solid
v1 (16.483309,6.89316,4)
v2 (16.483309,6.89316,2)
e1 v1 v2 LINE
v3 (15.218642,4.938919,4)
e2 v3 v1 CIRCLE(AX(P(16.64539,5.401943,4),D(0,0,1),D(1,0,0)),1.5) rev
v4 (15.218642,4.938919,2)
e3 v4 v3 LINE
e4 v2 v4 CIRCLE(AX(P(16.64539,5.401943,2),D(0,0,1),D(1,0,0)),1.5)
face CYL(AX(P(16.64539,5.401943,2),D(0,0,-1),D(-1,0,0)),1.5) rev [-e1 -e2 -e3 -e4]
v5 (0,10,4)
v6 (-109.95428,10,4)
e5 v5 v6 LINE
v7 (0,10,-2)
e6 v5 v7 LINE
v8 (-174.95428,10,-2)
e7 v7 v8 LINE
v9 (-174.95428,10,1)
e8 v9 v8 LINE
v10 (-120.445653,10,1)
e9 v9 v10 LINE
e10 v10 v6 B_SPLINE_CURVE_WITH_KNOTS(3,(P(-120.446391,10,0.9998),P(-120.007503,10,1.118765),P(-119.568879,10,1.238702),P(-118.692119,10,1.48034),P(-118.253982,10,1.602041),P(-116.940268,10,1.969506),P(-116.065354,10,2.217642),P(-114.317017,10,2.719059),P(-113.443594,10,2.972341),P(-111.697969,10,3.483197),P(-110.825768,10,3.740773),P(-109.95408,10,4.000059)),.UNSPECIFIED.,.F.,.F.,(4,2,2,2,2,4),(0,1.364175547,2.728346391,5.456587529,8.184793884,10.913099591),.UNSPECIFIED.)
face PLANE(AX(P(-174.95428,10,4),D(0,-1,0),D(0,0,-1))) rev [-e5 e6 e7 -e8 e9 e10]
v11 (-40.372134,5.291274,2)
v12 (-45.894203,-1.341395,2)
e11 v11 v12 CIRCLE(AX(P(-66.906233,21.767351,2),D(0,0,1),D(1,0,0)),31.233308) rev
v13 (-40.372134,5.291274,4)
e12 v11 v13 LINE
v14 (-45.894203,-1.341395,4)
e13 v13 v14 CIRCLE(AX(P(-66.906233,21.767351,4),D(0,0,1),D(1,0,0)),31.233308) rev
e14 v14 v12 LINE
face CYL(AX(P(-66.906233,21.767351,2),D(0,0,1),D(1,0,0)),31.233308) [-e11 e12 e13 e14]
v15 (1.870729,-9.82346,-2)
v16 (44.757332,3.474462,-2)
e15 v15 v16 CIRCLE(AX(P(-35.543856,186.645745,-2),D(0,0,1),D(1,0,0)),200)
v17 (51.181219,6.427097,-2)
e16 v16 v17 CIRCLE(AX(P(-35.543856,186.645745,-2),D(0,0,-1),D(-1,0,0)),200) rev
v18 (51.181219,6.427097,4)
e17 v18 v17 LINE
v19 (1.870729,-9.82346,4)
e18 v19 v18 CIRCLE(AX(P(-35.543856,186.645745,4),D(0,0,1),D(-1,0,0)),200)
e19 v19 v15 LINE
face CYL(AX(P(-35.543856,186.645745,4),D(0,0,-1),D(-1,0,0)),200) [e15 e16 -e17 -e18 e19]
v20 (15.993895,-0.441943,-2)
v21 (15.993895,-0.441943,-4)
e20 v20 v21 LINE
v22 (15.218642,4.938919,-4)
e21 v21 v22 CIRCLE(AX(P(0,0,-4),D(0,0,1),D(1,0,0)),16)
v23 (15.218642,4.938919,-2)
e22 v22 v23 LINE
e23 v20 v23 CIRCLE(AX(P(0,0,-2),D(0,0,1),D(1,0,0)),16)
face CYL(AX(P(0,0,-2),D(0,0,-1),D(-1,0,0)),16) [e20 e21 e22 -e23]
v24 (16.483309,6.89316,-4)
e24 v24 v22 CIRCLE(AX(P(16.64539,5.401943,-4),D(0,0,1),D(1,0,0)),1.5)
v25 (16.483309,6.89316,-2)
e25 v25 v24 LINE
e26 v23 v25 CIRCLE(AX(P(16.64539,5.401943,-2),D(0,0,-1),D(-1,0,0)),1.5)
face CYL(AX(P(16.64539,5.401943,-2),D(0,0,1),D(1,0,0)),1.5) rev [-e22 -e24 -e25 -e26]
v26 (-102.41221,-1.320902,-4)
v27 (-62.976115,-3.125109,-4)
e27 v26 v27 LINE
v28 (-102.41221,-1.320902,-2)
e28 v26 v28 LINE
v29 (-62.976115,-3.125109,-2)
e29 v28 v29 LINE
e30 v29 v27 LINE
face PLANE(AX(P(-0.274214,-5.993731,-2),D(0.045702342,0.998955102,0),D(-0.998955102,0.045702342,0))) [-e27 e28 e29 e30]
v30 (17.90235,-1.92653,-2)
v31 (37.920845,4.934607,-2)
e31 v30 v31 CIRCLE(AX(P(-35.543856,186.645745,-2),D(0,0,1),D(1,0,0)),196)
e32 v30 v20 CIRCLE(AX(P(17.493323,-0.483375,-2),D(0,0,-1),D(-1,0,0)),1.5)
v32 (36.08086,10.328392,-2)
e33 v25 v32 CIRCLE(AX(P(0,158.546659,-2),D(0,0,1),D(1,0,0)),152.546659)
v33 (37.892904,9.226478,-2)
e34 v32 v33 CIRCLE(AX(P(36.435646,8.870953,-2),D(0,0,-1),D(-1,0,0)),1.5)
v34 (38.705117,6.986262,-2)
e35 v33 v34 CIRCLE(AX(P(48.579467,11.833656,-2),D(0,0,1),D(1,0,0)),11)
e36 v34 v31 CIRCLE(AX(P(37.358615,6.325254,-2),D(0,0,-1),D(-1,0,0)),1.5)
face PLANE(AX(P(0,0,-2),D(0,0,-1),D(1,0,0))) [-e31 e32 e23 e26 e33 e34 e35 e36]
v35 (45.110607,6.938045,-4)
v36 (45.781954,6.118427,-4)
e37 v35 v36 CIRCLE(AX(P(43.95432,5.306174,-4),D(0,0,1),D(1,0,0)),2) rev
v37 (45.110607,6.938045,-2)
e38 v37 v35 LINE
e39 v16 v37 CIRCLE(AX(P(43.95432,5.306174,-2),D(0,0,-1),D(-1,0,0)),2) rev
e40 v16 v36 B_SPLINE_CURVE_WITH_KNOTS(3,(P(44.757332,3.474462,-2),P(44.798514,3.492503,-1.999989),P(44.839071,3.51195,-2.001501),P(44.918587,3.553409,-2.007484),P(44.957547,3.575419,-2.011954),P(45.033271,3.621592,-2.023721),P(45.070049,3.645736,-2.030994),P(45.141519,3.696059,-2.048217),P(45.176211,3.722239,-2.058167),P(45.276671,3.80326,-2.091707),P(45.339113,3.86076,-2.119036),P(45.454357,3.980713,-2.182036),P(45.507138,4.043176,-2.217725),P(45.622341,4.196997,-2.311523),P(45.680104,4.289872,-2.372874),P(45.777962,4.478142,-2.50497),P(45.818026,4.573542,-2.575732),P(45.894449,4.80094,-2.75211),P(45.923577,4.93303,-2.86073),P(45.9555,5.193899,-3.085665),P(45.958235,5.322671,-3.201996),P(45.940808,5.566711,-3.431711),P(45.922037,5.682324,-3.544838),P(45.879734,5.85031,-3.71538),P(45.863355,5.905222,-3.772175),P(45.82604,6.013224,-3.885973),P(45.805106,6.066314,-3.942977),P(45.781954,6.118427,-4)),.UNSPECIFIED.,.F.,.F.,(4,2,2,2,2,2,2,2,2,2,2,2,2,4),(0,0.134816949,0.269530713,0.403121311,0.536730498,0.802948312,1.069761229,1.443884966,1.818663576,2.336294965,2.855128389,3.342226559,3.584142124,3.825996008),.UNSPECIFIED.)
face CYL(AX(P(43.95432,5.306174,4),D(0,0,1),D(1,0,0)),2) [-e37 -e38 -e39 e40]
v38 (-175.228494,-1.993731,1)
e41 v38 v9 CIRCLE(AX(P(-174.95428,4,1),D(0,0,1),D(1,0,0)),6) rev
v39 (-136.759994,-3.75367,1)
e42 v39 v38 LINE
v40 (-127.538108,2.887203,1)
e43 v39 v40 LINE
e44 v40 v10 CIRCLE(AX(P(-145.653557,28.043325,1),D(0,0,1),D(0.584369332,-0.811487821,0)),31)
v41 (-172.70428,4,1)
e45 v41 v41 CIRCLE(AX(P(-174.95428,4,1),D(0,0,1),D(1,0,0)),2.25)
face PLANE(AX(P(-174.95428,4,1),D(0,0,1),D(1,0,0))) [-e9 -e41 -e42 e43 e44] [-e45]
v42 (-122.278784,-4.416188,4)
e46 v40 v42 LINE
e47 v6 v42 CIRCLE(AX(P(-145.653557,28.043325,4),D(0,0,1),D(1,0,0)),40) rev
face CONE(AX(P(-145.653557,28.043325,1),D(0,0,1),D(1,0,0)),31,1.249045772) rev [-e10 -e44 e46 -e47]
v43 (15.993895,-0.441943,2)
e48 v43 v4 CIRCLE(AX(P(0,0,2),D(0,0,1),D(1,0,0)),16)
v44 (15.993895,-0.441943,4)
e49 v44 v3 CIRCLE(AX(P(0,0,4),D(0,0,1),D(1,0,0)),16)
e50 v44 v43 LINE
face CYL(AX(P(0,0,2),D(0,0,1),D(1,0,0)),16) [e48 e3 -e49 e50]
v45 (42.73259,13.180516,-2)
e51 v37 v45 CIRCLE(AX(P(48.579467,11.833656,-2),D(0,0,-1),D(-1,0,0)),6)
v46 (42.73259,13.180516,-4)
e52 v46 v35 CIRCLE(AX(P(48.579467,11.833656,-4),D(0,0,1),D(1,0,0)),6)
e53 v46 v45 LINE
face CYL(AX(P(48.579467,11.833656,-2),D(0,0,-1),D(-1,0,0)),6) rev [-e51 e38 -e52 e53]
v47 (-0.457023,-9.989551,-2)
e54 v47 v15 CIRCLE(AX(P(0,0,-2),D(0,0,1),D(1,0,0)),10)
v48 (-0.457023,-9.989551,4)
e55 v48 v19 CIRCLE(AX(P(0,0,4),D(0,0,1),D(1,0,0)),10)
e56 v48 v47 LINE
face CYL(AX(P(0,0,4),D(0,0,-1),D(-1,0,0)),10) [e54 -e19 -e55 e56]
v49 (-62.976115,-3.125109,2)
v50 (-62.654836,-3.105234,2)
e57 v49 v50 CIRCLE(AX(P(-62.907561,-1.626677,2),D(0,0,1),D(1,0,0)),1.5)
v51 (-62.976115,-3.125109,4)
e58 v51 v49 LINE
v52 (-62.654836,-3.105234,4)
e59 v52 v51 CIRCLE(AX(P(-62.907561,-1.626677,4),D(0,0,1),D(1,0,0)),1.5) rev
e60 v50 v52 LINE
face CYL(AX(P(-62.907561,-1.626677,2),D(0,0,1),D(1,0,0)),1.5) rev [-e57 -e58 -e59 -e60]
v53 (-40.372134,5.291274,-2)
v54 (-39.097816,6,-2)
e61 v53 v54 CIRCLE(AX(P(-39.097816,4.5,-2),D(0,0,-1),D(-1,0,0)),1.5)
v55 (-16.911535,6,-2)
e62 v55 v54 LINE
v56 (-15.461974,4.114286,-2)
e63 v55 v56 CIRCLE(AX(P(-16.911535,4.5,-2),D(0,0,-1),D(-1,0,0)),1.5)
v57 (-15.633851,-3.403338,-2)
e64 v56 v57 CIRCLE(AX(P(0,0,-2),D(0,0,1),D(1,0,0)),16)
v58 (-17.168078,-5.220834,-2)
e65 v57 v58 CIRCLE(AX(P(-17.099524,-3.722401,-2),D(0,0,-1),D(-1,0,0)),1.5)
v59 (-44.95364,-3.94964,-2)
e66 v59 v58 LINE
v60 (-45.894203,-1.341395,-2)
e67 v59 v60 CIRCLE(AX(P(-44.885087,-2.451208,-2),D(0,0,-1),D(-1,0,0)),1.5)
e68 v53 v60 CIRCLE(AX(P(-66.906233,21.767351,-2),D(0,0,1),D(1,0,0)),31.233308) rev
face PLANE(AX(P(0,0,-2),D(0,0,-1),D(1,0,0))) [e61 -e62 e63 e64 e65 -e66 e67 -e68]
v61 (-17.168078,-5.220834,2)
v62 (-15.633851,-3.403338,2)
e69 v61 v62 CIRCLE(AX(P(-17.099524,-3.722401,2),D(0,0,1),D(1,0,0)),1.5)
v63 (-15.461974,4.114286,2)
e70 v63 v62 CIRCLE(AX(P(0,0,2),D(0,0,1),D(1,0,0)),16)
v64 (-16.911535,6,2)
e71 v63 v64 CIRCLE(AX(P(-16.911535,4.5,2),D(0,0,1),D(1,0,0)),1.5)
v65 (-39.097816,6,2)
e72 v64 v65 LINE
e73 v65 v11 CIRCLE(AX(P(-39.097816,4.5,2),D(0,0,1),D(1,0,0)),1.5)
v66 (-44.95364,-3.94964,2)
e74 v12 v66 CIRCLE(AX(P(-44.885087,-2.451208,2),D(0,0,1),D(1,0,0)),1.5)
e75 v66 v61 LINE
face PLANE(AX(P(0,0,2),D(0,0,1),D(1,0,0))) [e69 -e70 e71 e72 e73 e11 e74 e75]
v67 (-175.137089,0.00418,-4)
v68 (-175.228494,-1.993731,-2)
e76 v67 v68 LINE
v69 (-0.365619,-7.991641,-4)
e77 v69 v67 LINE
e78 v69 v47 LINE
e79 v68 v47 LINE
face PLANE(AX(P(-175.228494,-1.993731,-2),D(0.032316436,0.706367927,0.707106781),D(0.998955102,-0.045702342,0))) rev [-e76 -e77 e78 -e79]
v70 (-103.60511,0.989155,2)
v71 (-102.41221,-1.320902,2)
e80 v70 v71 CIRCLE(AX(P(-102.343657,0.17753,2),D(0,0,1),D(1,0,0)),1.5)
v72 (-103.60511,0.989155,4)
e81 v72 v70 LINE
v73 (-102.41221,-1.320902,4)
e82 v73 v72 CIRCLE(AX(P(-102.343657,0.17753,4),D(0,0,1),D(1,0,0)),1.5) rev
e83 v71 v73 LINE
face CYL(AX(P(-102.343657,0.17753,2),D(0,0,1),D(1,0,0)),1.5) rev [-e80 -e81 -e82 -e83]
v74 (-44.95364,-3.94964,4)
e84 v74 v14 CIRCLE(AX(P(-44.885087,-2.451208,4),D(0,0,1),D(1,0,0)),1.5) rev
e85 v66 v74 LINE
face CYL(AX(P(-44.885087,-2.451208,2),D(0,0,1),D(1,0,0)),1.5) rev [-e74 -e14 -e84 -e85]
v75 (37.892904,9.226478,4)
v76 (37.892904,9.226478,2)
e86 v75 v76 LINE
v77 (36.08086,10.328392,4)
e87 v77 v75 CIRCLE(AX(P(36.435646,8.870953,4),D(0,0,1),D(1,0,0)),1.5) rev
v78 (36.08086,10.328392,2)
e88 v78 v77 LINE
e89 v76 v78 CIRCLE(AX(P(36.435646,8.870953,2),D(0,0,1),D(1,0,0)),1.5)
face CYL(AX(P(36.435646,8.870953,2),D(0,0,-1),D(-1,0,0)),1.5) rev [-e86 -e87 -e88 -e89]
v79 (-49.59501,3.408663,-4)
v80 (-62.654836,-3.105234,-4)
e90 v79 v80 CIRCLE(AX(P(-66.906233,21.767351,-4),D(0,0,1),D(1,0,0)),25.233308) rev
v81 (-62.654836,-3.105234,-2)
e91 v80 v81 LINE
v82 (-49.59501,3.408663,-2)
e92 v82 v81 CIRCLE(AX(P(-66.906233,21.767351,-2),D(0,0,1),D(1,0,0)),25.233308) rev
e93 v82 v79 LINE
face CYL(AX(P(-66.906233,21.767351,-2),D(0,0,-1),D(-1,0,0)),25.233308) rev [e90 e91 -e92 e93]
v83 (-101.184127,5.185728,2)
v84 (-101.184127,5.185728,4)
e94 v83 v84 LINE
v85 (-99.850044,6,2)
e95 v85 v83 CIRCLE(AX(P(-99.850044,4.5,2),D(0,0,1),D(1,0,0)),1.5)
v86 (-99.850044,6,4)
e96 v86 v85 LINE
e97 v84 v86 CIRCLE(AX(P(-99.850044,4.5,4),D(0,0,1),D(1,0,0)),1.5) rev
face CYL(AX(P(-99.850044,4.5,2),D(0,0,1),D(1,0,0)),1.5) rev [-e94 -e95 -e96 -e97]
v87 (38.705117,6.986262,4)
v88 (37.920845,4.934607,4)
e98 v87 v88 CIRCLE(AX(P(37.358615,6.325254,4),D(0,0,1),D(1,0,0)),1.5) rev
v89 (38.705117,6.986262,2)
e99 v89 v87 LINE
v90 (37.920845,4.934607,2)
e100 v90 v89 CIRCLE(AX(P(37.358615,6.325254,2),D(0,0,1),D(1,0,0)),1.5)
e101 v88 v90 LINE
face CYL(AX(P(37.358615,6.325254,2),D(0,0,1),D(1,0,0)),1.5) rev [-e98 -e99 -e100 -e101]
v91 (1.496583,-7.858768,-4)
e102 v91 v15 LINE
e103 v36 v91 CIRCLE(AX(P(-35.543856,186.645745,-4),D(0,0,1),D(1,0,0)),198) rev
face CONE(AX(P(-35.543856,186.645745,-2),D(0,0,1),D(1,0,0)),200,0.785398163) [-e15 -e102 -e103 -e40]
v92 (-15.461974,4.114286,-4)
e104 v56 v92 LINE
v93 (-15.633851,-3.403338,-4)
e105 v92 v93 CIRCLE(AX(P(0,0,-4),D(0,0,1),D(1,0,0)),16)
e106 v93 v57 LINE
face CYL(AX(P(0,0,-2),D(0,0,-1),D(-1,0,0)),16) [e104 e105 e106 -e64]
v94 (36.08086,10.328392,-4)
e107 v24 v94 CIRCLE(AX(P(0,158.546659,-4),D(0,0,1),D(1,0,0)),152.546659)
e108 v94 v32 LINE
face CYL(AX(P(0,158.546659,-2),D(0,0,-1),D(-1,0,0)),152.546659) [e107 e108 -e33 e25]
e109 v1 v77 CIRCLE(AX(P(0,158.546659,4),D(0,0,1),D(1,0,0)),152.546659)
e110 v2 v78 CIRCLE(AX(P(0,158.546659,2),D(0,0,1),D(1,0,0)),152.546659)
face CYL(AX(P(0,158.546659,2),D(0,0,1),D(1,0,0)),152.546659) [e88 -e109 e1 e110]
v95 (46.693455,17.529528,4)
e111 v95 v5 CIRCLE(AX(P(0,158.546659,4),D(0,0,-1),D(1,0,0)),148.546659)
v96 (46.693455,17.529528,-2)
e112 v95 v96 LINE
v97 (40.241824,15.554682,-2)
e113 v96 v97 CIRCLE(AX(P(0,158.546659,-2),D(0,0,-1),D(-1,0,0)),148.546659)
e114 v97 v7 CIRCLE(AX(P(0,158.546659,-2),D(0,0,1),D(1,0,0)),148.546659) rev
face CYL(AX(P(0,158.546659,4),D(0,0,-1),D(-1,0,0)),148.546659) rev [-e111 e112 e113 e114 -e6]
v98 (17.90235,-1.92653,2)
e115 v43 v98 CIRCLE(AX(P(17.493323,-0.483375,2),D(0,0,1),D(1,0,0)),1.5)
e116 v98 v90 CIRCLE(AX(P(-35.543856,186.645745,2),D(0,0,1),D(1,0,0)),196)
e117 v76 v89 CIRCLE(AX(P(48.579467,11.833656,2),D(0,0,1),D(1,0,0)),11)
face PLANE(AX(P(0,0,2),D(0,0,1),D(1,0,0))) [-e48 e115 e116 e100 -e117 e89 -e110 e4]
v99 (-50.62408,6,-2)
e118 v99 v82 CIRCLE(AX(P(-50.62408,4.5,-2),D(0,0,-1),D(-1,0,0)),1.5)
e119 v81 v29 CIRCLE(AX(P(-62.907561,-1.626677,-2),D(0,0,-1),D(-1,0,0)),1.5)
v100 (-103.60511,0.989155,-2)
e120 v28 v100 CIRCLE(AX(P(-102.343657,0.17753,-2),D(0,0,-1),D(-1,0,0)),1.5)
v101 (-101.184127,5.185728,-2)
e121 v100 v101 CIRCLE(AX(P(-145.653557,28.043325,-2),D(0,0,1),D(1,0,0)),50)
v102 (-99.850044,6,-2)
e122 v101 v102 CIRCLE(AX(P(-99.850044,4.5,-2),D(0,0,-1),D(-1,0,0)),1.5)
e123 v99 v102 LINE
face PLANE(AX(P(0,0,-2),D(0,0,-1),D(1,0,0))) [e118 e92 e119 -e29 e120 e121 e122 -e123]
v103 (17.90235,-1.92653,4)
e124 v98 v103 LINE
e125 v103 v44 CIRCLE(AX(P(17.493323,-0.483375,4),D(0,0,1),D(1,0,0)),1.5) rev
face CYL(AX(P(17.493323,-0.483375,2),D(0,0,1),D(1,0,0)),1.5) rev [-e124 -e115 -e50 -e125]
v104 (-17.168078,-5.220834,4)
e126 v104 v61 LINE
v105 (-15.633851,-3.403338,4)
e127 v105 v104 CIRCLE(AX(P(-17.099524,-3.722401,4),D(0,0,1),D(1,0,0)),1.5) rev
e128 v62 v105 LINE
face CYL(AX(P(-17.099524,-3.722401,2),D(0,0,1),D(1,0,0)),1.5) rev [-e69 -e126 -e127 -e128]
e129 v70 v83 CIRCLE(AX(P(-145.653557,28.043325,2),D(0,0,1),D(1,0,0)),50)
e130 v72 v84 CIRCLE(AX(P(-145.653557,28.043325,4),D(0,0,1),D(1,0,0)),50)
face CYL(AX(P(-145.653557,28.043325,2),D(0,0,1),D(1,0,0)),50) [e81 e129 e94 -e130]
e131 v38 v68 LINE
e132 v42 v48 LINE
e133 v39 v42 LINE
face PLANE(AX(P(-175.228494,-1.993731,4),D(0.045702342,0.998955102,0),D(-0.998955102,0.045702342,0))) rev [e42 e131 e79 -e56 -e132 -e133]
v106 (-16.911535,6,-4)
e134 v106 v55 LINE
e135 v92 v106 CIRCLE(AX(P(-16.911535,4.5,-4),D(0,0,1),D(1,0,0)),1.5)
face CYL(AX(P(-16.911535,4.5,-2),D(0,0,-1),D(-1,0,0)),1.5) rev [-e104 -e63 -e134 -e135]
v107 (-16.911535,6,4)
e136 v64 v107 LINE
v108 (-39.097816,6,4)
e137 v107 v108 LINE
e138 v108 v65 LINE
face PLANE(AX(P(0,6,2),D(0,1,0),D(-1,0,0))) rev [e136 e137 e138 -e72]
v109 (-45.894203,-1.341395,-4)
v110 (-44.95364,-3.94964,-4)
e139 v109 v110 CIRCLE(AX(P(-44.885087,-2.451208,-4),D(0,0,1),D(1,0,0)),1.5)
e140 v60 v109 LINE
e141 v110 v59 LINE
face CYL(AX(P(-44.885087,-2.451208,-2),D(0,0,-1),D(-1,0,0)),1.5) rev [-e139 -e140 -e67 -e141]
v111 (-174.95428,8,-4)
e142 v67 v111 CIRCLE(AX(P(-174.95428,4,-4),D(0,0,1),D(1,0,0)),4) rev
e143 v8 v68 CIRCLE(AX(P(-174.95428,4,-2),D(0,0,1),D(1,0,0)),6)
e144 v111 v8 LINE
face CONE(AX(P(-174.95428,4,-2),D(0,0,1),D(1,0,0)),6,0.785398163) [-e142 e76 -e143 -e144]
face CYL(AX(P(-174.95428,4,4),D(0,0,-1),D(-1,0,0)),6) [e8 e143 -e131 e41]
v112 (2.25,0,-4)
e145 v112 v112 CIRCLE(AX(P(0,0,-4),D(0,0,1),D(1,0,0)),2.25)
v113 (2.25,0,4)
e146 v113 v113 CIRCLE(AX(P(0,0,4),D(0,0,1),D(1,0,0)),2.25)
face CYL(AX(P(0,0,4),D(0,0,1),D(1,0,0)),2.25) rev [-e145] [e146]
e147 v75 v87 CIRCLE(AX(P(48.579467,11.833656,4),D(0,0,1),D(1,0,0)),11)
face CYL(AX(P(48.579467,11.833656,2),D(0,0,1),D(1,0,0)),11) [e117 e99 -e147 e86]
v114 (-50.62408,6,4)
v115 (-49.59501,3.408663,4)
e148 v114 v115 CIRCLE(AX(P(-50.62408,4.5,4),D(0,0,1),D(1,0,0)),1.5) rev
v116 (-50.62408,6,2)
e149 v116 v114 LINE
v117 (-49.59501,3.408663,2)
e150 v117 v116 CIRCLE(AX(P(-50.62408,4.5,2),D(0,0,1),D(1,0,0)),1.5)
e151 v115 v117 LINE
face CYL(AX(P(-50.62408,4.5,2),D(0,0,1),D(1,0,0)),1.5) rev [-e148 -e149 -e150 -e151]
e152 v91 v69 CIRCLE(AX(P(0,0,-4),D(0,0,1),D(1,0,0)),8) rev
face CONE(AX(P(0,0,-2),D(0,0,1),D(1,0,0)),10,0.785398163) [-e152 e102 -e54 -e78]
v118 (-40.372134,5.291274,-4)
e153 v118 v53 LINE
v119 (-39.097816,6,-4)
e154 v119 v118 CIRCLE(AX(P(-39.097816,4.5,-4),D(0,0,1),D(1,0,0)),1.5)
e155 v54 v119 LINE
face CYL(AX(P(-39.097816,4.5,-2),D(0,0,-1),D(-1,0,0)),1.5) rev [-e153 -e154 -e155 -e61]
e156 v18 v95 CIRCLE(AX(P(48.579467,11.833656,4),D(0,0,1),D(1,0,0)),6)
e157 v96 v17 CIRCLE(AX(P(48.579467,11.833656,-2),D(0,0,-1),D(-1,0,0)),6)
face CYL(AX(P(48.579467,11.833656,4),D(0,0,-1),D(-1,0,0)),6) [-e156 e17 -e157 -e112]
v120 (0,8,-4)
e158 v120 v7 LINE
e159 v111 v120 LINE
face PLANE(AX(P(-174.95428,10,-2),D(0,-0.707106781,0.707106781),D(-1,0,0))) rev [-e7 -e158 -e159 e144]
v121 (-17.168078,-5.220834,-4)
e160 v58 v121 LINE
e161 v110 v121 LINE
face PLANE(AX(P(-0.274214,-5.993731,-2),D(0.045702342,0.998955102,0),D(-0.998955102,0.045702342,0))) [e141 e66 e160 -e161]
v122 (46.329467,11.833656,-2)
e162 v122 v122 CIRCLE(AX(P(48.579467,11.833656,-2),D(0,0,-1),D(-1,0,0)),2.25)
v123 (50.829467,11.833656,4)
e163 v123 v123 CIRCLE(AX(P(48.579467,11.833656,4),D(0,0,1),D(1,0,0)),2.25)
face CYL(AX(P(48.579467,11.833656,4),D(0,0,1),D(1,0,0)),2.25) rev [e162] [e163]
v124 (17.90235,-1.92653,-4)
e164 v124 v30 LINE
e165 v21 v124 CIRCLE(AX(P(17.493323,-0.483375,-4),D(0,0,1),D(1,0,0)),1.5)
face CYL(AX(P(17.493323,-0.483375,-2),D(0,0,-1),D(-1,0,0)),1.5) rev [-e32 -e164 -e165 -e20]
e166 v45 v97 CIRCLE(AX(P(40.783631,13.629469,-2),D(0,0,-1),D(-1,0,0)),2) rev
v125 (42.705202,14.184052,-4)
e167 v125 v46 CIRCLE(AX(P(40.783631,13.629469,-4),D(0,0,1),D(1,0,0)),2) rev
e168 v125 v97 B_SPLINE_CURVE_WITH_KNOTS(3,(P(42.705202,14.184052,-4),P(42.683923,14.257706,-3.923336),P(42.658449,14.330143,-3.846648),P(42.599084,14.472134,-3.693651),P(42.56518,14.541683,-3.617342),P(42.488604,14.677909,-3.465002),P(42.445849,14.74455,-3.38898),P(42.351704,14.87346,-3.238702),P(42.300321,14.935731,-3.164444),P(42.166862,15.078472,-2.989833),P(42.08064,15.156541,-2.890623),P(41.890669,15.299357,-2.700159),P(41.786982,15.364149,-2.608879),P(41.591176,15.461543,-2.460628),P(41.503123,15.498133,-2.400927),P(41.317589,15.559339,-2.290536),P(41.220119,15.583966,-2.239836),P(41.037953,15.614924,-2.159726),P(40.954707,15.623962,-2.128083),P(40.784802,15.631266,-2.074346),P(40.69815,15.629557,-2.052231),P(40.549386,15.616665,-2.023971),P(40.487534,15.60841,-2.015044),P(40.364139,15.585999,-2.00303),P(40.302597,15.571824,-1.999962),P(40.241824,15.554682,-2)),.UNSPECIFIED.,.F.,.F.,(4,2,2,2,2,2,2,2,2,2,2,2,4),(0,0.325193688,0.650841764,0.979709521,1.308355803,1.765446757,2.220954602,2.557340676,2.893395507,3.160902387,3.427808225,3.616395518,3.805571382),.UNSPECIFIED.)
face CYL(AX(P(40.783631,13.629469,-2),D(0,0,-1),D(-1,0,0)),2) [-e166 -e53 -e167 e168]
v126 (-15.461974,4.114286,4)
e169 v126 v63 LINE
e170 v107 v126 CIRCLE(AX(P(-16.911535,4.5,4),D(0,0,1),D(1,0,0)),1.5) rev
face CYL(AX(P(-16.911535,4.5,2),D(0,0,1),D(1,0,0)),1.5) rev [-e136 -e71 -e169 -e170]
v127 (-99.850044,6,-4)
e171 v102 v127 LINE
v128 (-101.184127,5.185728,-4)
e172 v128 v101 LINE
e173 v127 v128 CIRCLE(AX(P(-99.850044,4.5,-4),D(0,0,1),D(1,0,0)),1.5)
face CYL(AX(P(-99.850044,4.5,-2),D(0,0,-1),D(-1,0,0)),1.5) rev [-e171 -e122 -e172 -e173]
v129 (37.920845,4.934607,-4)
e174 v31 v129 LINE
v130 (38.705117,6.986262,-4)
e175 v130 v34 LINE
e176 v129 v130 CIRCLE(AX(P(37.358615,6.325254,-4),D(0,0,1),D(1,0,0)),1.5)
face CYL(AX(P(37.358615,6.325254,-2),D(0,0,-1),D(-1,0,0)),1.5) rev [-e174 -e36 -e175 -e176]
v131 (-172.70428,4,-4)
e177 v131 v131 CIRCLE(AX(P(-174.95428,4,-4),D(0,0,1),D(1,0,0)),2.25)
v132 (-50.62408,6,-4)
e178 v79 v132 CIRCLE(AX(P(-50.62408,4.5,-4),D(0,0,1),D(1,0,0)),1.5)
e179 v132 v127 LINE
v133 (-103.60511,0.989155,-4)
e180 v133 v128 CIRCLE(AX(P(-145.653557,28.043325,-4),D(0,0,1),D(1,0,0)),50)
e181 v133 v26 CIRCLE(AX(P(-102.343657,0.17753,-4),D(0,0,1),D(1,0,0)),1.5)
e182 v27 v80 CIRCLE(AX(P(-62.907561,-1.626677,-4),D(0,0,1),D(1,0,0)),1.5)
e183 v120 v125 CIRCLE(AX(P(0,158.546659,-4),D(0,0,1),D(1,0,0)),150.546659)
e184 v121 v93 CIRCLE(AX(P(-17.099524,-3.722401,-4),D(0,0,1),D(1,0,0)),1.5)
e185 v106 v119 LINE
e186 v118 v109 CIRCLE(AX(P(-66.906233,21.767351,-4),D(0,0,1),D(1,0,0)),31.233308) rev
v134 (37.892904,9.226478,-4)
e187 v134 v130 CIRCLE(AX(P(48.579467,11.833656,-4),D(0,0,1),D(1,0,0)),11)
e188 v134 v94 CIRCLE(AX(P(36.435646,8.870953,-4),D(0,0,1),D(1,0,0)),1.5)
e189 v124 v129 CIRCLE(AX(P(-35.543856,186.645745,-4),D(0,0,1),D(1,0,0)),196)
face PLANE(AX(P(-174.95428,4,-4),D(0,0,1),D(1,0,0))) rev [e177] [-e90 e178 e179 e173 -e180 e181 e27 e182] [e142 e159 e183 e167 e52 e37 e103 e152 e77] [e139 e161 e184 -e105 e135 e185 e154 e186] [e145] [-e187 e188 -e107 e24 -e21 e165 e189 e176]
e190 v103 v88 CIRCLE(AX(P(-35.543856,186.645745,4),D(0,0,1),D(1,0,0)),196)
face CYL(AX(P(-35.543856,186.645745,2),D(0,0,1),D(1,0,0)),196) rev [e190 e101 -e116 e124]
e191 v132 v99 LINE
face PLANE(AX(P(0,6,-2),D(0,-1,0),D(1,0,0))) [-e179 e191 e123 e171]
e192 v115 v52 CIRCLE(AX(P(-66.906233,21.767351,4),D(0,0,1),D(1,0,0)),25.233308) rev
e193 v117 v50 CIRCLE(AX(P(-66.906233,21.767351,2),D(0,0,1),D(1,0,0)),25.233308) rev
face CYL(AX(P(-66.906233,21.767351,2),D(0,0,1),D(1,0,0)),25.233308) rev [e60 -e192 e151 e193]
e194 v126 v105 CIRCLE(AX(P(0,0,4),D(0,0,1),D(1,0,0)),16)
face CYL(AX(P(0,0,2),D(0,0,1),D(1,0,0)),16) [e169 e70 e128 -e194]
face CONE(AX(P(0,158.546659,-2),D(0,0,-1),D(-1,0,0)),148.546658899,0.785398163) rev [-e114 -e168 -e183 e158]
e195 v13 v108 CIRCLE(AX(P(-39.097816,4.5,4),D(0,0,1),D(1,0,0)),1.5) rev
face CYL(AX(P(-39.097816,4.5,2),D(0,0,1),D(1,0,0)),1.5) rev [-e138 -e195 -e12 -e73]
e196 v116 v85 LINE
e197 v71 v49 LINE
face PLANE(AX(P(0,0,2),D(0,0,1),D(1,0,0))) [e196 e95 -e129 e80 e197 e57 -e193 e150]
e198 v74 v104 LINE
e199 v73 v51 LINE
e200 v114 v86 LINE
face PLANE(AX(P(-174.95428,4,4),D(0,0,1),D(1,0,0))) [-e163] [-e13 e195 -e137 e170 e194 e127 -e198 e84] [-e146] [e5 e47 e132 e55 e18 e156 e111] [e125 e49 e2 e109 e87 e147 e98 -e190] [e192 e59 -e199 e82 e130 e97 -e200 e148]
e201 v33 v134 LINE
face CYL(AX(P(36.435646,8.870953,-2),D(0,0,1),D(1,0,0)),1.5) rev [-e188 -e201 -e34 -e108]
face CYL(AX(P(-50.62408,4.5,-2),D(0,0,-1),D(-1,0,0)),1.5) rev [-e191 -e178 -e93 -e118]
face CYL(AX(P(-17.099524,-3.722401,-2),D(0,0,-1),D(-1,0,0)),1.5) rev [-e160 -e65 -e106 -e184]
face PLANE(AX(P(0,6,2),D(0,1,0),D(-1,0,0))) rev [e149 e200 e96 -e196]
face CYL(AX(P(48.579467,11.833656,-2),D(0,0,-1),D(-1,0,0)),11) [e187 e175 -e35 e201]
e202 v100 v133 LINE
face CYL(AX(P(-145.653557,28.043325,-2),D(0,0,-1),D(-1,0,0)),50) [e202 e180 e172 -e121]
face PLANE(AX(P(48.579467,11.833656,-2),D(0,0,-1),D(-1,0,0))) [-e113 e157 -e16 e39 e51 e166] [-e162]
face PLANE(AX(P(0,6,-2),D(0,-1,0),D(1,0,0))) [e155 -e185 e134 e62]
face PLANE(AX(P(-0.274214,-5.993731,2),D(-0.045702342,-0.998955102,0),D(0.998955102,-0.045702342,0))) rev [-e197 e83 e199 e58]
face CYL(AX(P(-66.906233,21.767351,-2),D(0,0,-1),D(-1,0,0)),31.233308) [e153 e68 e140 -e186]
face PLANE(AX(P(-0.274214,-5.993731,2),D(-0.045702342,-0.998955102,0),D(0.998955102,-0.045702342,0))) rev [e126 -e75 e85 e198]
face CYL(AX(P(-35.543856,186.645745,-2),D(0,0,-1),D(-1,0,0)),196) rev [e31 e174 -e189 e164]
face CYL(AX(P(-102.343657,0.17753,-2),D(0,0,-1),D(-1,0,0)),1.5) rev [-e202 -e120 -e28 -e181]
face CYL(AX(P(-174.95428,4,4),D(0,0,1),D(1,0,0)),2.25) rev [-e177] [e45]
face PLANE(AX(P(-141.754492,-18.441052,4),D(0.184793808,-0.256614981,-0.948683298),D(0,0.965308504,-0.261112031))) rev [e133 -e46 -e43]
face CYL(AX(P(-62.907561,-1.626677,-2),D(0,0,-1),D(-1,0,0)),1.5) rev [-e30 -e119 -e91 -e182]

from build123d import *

# Parameters (mm, degrees)
BOSS_EXTRUDE2_DEPTH     = 4
CUT_EXTRUDE1_DEPTH      = 3
BOSS_EXTRUDE4_DEPTH     = 24
CUT_EXTRUDE3_DEPTH      = 25
CUT_EXTRUDE3_DEPTH_BACK = 183.067360447
SKETCH8_OUTSIDE_W       = 285.221
SKETCH8_OUTSIDE_H       = 85.963
CUT_EXTRUDE5_START      = -2
SKETCH15_R              = 6
CUT_EXTRUDE5_DEPTH      = 2
FILLET2_START           = -5
FILLET2_DEPTH           = 3
CUT_EXTRUDE4_DEPTH      = 2
FILLET1_R               = 1.5
FILLET1_OF_MIRROR2_R    = 1.5
CHAMFER2_SIZE           = 2
M4_CLEARANCE_HOLE1_D    = 4.5


with BuildPart() as part:
    # Sketch1 → Boss-Extrude2 (new, symmetric)
    with BuildSketch(Plane.XY):
        with BuildLine():
            Line((-174.954279742, 10), (0, 10))
            ThreePointArc((0, 10), (23.648322027, 11.894462409), (46.69345503, 17.529528282))
            ThreePointArc((46.69345503, 17.529528282), (54.142205969, 14.082195987), (51.181218931, 6.427096624))
            ThreePointArc((51.181218931, 6.427096624), (27.055536633, -3.305079876), (1.870729257, -9.823460289))
            ThreePointArc((1.870729257, -9.823460289), (0.711714534, -9.974640967), (-0.457023425, -9.98955102))
            Line((-0.457023425, -9.98955102), (-175.228493797, -1.993730612))
            ThreePointArc((-175.228493797, -1.993730612), (-180.95271219, 4.137142857), (-174.954279742, 10))
        make_face()
    extrude(amount=BOSS_EXTRUDE2_DEPTH, both=True)

    # Sketch4 → Cut-Extrude1 (cut)
    with BuildSketch(Plane.XY.offset(4)):
        with BuildLine():
            ThreePointArc((-174.954279742, 10), (-180.95271219, 4.137142857), (-175.228493797, -1.993730612))
            Line((-175.228493797, -1.993730612), (-122.27878396, -4.416187605))
            ThreePointArc((-122.27878396, -4.416187605), (-115.249733713, 2.05087413), (-109.954279742, 10))
            Line((-109.954279742, 10), (-174.954279742, 10))
        make_face()
    extrude(amount=-CUT_EXTRUDE1_DEPTH, mode=Mode.SUBTRACT)

    # Sweep2: sweep along a curve in space
    with BuildLine() as sweep2_path:
        ThreePointArc((-122.27878396, -4.416187605, 1), (-115.249733713, 2.05087413, 1), (-109.954279742, 10, 1))
    # Sketch9 → Sweep2 (sweep)
    with BuildSketch(Plane(origin=(-18.347220561, -36.300543819, 0), x_dir=(0.8924819376724606, -0.45108313083999296, 0), z_dir=(0.4510831308399929, 0.8924819376724605, 0))):
        Polygon((-102.643039948, -1), (-102.643039948, -4), (-111.643039948, -1), align=None)
    sweep(path=sweep2_path.line)

    # Sketch10 → Boss-Extrude4 (add)
    with BuildSketch(Plane(origin=(-82.616299838, -59.493723404, 0), x_dir=(0, 0, 1), z_dir=(-0.8114878209620178, -0.584369332212357, 0))):
        Polygon((1, 67.87228887), (4, 67.87228887), (1, 76.87228887), align=None)
    extrude(amount=BOSS_EXTRUDE4_DEPTH)

    # Sketch8 outside → Cut-Extrude3 (cut, two sides: drawn at the far end of the back side and taken through both)
    with BuildSketch(Plane.XY.offset(-4).offset(-CUT_EXTRUDE3_DEPTH_BACK)):
        with Locations((-63.1875, -0.3035)):
            Rectangle(SKETCH8_OUTSIDE_W, SKETCH8_OUTSIDE_H)
        with BuildLine():
            Line((0, 10), (-174.954279742, 10))
            ThreePointArc((-174.954279742, 10), (-180.95271219, 4.137142857), (-175.228493797, -1.993730612))
            Line((-175.228493797, -1.993730612), (-0.457023425, -9.98955102))
            ThreePointArc((-0.457023425, -9.98955102), (0.711714534, -9.974640967), (1.870729257, -9.823460289))
            ThreePointArc((1.870729257, -9.823460289), (27.055536633, -3.305079876), (51.181218931, 6.427096624))
            ThreePointArc((51.181218931, 6.427096624), (54.142205969, 14.082195987), (46.69345503, 17.529528282))
            ThreePointArc((46.69345503, 17.529528282), (23.648322027, 11.894462409), (0, 10))
        make_face(mode=Mode.SUBTRACT)
    extrude(amount=CUT_EXTRUDE3_DEPTH + CUT_EXTRUDE3_DEPTH_BACK, mode=Mode.SUBTRACT)

    # Sketch15 → Cut-Extrude5 (cut)
    with BuildSketch(Plane(origin=(0, 0, -4), x_dir=(-1, 0, 0), z_dir=(0, 0, -1)).offset(CUT_EXTRUDE5_START)):
        with Locations((-48.579466687, 11.83365609)):
            Circle(SKETCH15_R)
    extrude(amount=CUT_EXTRUDE5_DEPTH, mode=Mode.SUBTRACT)

    # Fillet2: read off the stored shape, not the designer's step
    # Fillet2 outline → Fillet2 (cut)
    with BuildSketch(Plane.XY.offset(FILLET2_START)):
        with BuildLine():
            ThreePointArc((40.241823664, 15.554681857), (42.163553049, 15.077161786), (42.732589809, 13.180515689))
            ThreePointArc((42.732589809, 13.180515689), (44.143492284, 15.873721819), (46.69345503, 17.529528282))
            ThreePointArc((46.69345503, 17.529528282), (43.478853193, 16.505470524), (40.241823664, 15.554681857))
        make_face()
        with BuildLine():
            ThreePointArc((45.110606605, 6.938044817), (45.943997016, 5.103233461), (44.757331788, 3.474461553))
            ThreePointArc((44.757331788, 3.474461553), (47.982323267, 4.922391468), (51.181218931, 6.427096624))
            ThreePointArc((51.181218931, 6.427096624), (48.076241077, 5.854796334), (45.110606605, 6.938044817))
        make_face()
    extrude(amount=FILLET2_DEPTH, mode=Mode.SUBTRACT)

    # Sketch14 → Cut-Extrude4 (cut)
    with BuildSketch(Plane.XY.offset(4)):
        with BuildLine():
            Line((-14.832396974, 6), (-39.944961285, 6))
            ThreePointArc((-39.944961285, 6), (-43.908510482, 0.633863605), (-48.921261535, -3.768121054))
            Line((-48.921261535, -3.768121054), (-15.091112688, -5.315855326))
            ThreePointArc((-15.091112688, -5.315855326), (-15.995819862, 0.365714286), (-14.832396974, 6))
        make_face()
        with BuildLine():
            ThreePointArc((-62.816908131, -3.132393183), (-54.164987884, -0.012926968), (-47.205713301, 6))
            Line((-47.205713301, 6), (-100.774922993, 6))
            ThreePointArc((-100.774922993, 6), (-102.783982304, 2.310087116), (-105.095731275, -1.198130822))
            Line((-105.095731275, -1.198130822), (-62.816908131, -3.132393183))
        make_face()
        with BuildLine():
            ThreePointArc((37.636421144, 10.71573201), (26.161853464, 8.260130678), (14.532481339, 6.693802069))
            ThreePointArc((14.532481339, 6.693802069), (15.849901808, 2.186461221), (15.802019276, -2.509220357))
            ThreePointArc((15.802019276, -2.509220357), (27.792022964, 1.161065661), (39.522801968, 5.590513918))
            ThreePointArc((39.522801968, 5.590513918), (38.25647934, 8.034191359), (37.636421144, 10.71573201))
        make_face()
    cut_extrude4 = extrude(amount=-CUT_EXTRUDE4_DEPTH, mode=Mode.SUBTRACT)

    # Fillet1
    fillet1_edges = [part.edges().sort_by_distance(p)[0] for p in [
        (14.532481339, 6.693802069, 3),
        (37.636421144, 10.71573201, 3),
        (39.522801968, 5.590513918, 3),
        (15.802019276, -2.509220357, 3),
        (-39.944961285, 6, 3),
        (-14.832396974, 6, 3),
        (-15.091112688, -5.315855326, 3),
        (-48.921261535, -3.768121054, 3),
        (-47.205713301, 6, 3),
        (-62.816908131, -3.132393183, 3),
        (-105.095731275, -1.198130822, 3),
        (-100.774922993, 6, 3),
    ]]
    fillet(fillet1_edges, radius=FILLET1_R)

    # Mirror2: Cut-Extrude4 across plane
    add(cut_extrude4.mirror(Plane.XY), mode=Mode.SUBTRACT)

    # Fillet1 of Mirror2
    fillet1_of_mirror2_edges = [part.edges().sort_by_distance(p)[0] for p in [
        (14.532481339, 6.693802069, -3),
        (37.636421144, 10.71573201, -3),
        (39.522801968, 5.590513918, -3),
        (15.802019276, -2.509220357, -3),
        (-39.944961285, 6, -3),
        (-14.832396974, 6, -3),
        (-15.091112688, -5.315855326, -3),
        (-48.921261535, -3.768121054, -3),
        (-47.205713301, 6, -3),
        (-62.816908131, -3.132393183, -3),
        (-105.095731275, -1.198130822, -3),
        (-100.774922993, 6, -3),
    ]]
    fillet(fillet1_of_mirror2_edges, radius=FILLET1_OF_MIRROR2_R)

    # Chamfer2
    # the kernel refuses this chamfer: 2 mm, written as the material it takes off along each edge
    with BuildSketch(Plane(origin=(-35.543855882, 186.645745489, -4), x_dir=(0.42492369608644903, -0.9052291712623004, 0), z_dir=(0.9052291712623004, 0.42492369608644903, 0))) as chamfer2_piece_1:
        Polygon((200 - CHAMFER2_SIZE, 0), (200, -CHAMFER2_SIZE), (200, 0), align=None)
    revolve(axis=Axis((-35.543855882, 186.645745489, -4), (0, 0, -1)), revolution_arc=14.36382118, mode=Mode.SUBTRACT)
    with BuildSketch(Plane(origin=(-0.457023425, -9.98955102, -4), x_dir=(0.04570234246318501, 0.9989551020408164, 0), z_dir=(-0.9989551020408164, 0.04570234246318502, 0)), Plane(origin=(-174.954279742, 10, -4), x_dir=(0, -1, 0), z_dir=(1, 0, 0))) as chamfer2_piece_2:
        Polygon((CHAMFER2_SIZE, 0), (0, -CHAMFER2_SIZE), (0, 0), align=None)
    extrude(amount=174.954279742, mode=Mode.SUBTRACT)
    with BuildSketch(Plane(origin=(0, 158.546658899, -4), x_dir=(0, -1, 0), z_dir=(-1, 0, 0))) as chamfer2_piece_3:
        Polygon((148.546658899 + CHAMFER2_SIZE, 0), (148.546658899, CHAMFER2_SIZE), (148.546658899, 0), align=None)
    revolve(axis=Axis((0, 158.546658899, -4), (0, 0, 1)), revolution_arc=17.7019097, mode=Mode.SUBTRACT)
    with BuildSketch(Plane(origin=(-174.954279742, 4, -4), x_dir=(-0.045702342463191735, -0.998955102040816, 0), z_dir=(0.998955102040816, -0.045702342463191735, 0))) as chamfer2_piece_4:
        Polygon((6 - CHAMFER2_SIZE, 0), (6, -CHAMFER2_SIZE), (6, 0), align=None)
    revolve(axis=Axis((-174.954279742, 4, -4), (0, 0, -1)), revolution_arc=177.380536242, mode=Mode.SUBTRACT)
    with BuildSketch(Plane(origin=(0, 0, -4), x_dir=(0.187072925695108, -0.9823460288879232, 0), z_dir=(0.9823460288879232, 0.187072925695108, 0))) as chamfer2_piece_5:
        Polygon((10 - CHAMFER2_SIZE, 0), (10, -CHAMFER2_SIZE), (10, 0), align=None)
    revolve(axis=Axis((0, 0, -4), (0, 0, -1)), revolution_arc=13.401476298, mode=Mode.SUBTRACT)

    # M4 Clearance Hole1 (through all)
    with Locations(Plane.XY.offset(4)):
        with Locations((0, 0), (48.579466687, 11.83365609), (-174.954279742, 4)):
            Hole(M4_CLEARANCE_HOLE1_D / 2)


solid = part.part
